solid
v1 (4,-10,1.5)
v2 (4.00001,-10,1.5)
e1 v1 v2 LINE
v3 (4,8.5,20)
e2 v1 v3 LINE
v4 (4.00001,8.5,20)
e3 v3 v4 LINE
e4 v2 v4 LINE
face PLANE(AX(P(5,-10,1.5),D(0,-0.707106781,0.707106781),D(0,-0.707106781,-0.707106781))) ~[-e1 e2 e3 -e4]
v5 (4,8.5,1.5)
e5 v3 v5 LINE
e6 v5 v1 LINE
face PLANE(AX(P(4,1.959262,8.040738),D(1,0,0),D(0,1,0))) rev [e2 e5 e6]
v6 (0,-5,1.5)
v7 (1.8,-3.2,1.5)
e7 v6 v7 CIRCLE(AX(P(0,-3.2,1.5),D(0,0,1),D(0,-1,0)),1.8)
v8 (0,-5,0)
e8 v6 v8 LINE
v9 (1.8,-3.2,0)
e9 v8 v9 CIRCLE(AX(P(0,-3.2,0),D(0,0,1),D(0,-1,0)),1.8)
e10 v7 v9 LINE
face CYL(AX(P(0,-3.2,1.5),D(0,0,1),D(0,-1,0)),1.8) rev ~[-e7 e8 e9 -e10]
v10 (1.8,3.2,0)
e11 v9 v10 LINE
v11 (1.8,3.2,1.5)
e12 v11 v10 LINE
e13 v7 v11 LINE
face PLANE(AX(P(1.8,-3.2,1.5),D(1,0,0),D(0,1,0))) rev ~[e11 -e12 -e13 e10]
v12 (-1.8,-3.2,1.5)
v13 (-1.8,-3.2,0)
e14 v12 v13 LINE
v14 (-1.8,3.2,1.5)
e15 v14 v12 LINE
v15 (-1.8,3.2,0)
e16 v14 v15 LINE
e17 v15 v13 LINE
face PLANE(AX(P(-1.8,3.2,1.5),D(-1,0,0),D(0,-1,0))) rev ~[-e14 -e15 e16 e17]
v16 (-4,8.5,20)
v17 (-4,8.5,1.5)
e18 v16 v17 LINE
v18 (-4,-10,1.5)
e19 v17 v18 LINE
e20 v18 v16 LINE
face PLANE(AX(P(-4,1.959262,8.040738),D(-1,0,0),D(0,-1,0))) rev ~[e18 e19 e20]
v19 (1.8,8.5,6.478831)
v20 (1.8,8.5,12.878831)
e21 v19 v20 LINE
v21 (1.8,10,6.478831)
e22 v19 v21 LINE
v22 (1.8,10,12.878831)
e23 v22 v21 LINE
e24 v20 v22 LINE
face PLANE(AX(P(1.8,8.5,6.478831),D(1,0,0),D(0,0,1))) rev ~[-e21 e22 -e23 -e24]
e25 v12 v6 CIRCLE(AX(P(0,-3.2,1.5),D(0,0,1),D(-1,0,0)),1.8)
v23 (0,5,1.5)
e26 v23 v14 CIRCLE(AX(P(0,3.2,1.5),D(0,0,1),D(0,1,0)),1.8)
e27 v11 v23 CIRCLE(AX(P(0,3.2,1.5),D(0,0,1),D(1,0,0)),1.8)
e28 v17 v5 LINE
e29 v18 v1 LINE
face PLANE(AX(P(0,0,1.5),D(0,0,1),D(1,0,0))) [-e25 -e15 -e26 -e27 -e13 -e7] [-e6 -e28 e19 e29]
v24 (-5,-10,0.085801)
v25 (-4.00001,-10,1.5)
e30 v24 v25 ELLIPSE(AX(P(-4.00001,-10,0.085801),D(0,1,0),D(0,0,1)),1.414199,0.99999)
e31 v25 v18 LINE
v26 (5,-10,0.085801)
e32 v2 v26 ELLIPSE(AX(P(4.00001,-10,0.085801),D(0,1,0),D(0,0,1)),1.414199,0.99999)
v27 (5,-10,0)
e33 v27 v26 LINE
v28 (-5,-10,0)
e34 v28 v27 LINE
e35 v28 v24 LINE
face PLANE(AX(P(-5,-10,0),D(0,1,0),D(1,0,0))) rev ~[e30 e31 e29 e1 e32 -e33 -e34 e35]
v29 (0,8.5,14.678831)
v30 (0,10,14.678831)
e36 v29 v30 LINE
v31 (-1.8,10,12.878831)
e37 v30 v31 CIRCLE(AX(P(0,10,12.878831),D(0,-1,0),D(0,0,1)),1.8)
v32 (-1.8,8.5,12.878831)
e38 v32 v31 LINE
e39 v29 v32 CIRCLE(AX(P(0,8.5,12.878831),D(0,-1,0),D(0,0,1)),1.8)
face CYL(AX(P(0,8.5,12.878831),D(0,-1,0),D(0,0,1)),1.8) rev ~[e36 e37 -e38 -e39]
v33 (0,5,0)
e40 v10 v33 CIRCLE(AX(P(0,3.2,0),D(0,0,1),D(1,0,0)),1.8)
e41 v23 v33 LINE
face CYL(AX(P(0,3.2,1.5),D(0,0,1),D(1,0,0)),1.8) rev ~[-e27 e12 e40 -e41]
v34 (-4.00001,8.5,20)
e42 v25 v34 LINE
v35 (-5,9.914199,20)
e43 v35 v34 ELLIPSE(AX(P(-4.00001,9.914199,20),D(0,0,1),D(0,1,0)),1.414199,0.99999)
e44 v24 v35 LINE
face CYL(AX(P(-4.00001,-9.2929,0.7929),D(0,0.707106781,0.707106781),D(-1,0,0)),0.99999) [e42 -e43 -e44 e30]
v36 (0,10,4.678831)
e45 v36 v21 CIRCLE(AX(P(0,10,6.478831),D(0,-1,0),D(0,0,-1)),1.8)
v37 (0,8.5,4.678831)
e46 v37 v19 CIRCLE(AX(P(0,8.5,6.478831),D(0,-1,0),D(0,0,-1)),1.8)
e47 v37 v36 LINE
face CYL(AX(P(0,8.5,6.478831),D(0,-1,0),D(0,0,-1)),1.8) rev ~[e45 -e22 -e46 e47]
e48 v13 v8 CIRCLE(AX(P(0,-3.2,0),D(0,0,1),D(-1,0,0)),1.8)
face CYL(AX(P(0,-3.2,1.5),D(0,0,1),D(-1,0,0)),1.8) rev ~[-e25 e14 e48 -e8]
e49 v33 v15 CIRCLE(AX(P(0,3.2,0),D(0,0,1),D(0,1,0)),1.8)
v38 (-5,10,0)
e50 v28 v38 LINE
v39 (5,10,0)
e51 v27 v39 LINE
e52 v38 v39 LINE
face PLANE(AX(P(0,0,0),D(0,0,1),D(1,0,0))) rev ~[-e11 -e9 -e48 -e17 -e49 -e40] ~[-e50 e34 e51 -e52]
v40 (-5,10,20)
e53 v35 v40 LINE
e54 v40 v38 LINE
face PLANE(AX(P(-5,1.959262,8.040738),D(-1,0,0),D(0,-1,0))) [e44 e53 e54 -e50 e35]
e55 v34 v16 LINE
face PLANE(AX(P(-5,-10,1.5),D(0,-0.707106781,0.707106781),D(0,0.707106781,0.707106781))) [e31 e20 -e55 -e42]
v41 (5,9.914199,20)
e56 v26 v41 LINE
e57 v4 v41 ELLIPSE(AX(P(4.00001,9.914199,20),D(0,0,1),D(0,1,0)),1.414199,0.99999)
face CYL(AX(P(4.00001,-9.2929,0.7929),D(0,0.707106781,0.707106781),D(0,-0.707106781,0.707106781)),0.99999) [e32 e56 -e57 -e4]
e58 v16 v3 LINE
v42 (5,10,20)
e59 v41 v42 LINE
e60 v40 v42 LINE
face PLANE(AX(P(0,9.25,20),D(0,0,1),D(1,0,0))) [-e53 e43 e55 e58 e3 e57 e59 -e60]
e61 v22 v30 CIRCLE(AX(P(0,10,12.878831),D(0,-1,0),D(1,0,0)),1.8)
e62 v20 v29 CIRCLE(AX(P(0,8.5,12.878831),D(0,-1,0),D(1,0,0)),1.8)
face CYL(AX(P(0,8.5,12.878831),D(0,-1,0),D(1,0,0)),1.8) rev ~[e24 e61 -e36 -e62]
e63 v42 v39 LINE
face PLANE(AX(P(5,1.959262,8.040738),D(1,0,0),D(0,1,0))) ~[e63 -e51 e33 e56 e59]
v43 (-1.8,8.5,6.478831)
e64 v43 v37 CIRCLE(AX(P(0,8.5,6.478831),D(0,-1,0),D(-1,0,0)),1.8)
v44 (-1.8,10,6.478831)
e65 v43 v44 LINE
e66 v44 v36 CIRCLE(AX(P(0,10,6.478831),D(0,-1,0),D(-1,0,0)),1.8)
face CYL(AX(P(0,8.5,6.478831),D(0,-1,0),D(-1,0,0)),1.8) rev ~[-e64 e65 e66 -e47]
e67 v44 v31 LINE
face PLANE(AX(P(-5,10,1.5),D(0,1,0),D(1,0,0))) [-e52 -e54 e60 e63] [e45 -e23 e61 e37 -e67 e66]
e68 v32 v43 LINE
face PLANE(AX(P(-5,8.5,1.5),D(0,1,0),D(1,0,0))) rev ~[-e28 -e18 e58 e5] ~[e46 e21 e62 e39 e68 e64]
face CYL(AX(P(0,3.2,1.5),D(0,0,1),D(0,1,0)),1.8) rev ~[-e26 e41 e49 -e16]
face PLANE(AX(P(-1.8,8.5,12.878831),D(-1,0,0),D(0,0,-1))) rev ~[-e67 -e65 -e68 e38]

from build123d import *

# Parameters (mm, degrees)
F0_W     = 10
F0_H     = 20
F1_DEPTH = 1.5
F2_W     = 10
F2_H     = 1.5
F3_DEPTH = 18.5
F5_DEPTH = 1.501
F7_DEPTH = 1.501
F9_DEPTH = 1
F10_R    = 0.99999


# Not quite as in the source:
# - a fillet or chamfer is up to 0.001 mm smaller than in the source, because OpenCascade refuses the exact size
# - a pattern or mirror of a feature is missing from the dataset's text; its kind, count and spacing are read off the source's solid


with BuildPart() as f1:
    # F0 (on Top) → F1 (new body)
    with BuildSketch(Plane.XY):
        Rectangle(F0_W, F0_H)
    extrude(amount=F1_DEPTH)

    # F2 (on face) → F3 (join)
    with BuildSketch(Plane.XY.offset(1.5)):
        with Locations((0, 9.25)):
            Rectangle(F2_W, F2_H)
    extrude(amount=F3_DEPTH)

    # F4 (on face) → F5 (cut, through all)
    with BuildSketch(Plane.XY.offset(1.5)):
        with BuildLine():
            ThreePointArc((0, -5), (1.2727922061, -4.4727922061), (1.8, -3.2))
            Line((1.8, -3.2), (1.8, 3.2))
            ThreePointArc((1.8, 3.2), (1.2727922061, 4.4727922061), (0, 5))
            ThreePointArc((0, 5), (-1.2727922061, 4.4727922061), (-1.8, 3.2))
            Line((-1.8, 3.2), (-1.8, -3.2))
            ThreePointArc((-1.8, -3.2), (-1.2727922061, -4.4727922061), (0, -5))
        make_face()
    extrude(amount=-F5_DEPTH, mode=Mode.SUBTRACT)

    # F6 (on face) → F7 (cut, through all)
    with BuildSketch(Plane.XZ.offset(-8.5)):
        with BuildLine():
            ThreePointArc((0, 4.6788305809), (1.2727922061, 5.2060383747), (1.8, 6.4788305809))
            Line((1.8, 6.4788305809), (1.8, 12.8788305809))
            ThreePointArc((1.8, 12.8788305809), (1.2727922061, 14.151622787), (0, 14.6788305809))
            ThreePointArc((0, 14.6788305809), (-1.2727922061, 14.151622787), (-1.8, 12.8788305809))
            Line((-1.8, 12.8788305809), (-1.8, 6.4788305809))
            ThreePointArc((-1.8, 6.4788305809), (-1.2727922061, 5.2060383747), (0, 4.6788305809))
        make_face()
    extrude(amount=-F7_DEPTH, mode=Mode.SUBTRACT)

    # F8 (on face) → F9 (join)
    with BuildSketch(Plane(origin=(-5, 0, 0), x_dir=(0, -1, 0), z_dir=(-1, 0, 0))):
        Polygon((10, 1.5), (-8.5, 20), (-8.5, 1.5), align=None)
    f9 = extrude(amount=-F9_DEPTH)

    # F9_copies: F9 across plane
    add(f9.mirror(Plane(origin=(0, 0, 0), x_dir=(0, 0, 1), z_dir=(1, 0, 0))))

    # F10 (radius 1 in the source; OpenCascade refuses exactly that, so slightly less here)
    f10_edges = [f1.edges().sort_by_distance(p)[0] for p in [
        (-5, -0.75, 10.75),
        (5, -0.75, 10.75),
    ]]
    fillet(f10_edges, radius=F10_R)


solid = f1.part
